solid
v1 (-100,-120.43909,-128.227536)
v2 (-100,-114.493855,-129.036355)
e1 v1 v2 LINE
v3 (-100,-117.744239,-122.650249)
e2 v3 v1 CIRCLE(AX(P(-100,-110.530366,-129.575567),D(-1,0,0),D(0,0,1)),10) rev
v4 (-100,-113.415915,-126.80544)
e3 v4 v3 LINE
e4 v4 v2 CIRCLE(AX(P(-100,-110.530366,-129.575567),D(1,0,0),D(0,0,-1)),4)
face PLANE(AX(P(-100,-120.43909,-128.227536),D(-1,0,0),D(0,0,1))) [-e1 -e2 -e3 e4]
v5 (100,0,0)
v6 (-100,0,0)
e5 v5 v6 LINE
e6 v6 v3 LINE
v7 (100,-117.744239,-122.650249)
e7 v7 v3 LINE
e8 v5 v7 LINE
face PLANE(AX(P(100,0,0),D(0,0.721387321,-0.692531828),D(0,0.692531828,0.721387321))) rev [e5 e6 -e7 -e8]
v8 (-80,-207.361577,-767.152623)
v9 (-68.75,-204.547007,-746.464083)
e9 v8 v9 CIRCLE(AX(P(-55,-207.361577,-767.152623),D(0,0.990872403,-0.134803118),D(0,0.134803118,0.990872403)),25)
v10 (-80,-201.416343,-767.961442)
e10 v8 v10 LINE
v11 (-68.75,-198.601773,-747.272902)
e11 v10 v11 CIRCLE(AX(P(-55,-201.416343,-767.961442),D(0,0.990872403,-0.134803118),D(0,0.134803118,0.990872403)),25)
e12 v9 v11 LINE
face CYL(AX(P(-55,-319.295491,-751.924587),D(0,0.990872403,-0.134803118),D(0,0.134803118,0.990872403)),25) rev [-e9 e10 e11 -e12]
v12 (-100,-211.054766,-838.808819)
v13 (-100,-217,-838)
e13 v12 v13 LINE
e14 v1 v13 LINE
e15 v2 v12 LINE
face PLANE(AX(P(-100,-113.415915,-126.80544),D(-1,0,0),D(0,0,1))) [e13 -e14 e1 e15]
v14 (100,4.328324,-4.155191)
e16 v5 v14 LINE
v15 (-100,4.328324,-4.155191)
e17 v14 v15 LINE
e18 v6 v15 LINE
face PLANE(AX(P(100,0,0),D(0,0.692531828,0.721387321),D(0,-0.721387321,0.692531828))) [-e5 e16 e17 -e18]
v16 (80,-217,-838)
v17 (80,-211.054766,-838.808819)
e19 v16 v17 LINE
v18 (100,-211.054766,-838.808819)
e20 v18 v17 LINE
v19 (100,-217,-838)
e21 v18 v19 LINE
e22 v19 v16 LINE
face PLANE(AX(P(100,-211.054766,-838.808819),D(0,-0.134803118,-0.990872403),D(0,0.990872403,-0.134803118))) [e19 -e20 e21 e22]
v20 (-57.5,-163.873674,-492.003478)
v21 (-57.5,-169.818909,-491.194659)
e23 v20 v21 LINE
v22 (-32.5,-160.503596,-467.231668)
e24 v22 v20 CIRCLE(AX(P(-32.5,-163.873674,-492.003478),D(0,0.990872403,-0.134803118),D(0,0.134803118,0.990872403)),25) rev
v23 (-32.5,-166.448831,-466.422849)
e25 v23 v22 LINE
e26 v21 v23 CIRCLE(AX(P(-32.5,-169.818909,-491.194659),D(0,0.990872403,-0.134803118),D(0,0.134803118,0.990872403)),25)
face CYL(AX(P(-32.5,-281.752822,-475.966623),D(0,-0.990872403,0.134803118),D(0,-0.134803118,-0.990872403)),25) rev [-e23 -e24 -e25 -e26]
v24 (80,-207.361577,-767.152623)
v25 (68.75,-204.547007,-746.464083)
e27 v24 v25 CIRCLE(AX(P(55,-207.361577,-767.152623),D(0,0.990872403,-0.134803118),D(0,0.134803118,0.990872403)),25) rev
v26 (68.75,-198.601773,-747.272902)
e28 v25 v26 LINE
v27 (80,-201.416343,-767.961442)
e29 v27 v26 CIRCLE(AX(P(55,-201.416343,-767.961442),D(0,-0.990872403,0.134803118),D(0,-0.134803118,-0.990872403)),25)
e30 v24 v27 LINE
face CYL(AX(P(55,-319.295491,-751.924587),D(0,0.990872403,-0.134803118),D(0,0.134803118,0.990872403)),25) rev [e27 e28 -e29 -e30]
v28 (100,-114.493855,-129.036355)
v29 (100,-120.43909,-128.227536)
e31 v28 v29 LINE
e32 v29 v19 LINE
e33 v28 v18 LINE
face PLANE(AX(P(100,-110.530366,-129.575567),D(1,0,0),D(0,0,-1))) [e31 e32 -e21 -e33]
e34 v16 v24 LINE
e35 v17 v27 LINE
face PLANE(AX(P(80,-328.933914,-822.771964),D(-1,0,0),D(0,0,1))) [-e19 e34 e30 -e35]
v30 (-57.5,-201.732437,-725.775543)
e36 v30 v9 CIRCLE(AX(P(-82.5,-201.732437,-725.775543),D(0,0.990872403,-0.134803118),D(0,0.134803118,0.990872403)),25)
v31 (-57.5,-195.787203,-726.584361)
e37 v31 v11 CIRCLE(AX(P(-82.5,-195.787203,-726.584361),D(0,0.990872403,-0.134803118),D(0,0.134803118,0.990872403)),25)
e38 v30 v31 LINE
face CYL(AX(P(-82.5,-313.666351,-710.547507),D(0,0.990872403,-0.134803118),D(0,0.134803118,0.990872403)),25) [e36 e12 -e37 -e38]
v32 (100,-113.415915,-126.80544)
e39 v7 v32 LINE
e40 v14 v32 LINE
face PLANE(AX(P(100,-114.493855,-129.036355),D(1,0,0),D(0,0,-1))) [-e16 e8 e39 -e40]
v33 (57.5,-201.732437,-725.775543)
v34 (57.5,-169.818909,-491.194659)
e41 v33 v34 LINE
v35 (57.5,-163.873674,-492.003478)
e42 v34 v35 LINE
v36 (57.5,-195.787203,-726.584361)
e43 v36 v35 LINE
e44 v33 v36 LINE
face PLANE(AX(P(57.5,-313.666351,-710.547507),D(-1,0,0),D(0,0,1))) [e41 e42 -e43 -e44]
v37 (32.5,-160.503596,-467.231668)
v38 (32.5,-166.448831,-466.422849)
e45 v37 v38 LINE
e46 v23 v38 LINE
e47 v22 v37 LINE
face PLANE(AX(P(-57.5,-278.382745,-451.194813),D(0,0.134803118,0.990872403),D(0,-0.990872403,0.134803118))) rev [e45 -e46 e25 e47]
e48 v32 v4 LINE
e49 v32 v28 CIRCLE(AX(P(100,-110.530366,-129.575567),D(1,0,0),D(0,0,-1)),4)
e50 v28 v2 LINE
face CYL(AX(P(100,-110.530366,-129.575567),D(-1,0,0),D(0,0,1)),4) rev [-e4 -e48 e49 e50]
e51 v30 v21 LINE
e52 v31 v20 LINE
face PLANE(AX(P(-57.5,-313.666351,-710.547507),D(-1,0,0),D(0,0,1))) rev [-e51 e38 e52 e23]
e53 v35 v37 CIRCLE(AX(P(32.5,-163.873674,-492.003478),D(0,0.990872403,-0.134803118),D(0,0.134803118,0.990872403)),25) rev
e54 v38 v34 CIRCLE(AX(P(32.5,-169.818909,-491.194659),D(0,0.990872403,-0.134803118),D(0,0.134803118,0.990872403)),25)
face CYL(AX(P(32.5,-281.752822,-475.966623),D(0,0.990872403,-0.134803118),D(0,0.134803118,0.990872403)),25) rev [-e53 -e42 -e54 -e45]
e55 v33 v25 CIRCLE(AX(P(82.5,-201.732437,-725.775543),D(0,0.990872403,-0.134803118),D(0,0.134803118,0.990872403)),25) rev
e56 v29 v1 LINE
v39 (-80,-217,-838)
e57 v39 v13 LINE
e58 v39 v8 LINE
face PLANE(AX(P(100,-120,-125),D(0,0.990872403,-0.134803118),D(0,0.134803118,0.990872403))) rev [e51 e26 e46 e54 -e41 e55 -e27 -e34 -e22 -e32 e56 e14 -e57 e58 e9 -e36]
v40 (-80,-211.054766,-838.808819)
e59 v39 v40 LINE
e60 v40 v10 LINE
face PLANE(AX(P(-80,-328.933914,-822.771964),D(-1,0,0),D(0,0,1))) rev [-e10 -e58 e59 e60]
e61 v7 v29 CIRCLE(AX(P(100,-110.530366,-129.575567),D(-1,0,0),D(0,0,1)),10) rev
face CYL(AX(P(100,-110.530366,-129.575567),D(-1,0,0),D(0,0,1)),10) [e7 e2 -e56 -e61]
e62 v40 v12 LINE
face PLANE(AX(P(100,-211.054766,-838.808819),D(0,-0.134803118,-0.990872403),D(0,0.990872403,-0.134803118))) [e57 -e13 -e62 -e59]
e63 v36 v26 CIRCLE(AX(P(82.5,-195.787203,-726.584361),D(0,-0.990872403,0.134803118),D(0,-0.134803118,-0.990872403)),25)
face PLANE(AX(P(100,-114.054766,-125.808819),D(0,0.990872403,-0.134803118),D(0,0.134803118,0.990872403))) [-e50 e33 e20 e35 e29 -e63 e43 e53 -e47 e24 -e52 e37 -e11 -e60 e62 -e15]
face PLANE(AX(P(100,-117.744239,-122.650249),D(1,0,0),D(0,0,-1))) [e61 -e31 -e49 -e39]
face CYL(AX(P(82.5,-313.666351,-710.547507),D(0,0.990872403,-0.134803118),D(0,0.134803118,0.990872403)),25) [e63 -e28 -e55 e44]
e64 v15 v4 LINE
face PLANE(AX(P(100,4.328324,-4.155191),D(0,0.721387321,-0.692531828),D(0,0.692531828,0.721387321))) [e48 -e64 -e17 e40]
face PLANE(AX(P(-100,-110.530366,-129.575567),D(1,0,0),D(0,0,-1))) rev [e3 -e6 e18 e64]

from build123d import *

# Parameters (mm, degrees)
SM_BASE_FLANGE_1_DEPTH = 100
CUT_EXTRUDE_1_DEPTH    = 867.216543549
FILLET_1_R             = 25


# Sheet-metal steps are written as plain solids
with BuildPart() as part:
    # Sketch 1 → 基体-法兰1 (new, symmetric)
    with BuildSketch(Plane(origin=(0, 0, 0), x_dir=(0, 0, -1), z_dir=(1, 0, 0))):
        with BuildLine():
            Line((0, 0), (122.650248882, -117.744238927))
            ThreePointArc((122.650248882, -117.744238927), (125.224977196, -119.534385204), (128.227535984, -120.439089748))
            Line((128.227535984, -120.439089748), (838, -217))
            Line((838, -217), (838.808818708, -211.054765581))
            Line((838.808818708, -211.054765581), (129.036354692, -114.493855329))
            ThreePointArc((129.036354692, -114.493855329), (127.835331177, -114.131973511), (126.805439851, -113.415915001))
            Line((126.805439851, -113.415915001), (4.155190969, 4.328323926))
            Line((4.155190969, 4.328323926), (0, 0))
        make_face()
    extrude(amount=SM_BASE_FLANGE_1_DEPTH, both=True)

    # 草图4 → 切除-拉伸1 (cut, through all)
    with BuildSketch(Plane(origin=(0, -95.177553726, 12.94841895), x_dir=(1, 0, 0), z_dir=(0, 0.9908724031816991, -0.13480311796440184))):
        with BuildLine():
            Line((-80, 859.603350465), (-80, 788.103350465))
            ThreePointArc((-80, 788.103350465), (-77.008521077, 776.244809239), (-68.75, 767.224234104))
            ThreePointArc((-68.75, 767.224234104), (-60.491478923, 758.203658969), (-57.5, 746.345117743))
            Line((-57.5, 746.345117743), (-57.5, 484.603350465))
            Line((-57.5, 484.603350465), (57.5, 484.603350465))
            Line((57.5, 484.603350465), (57.5, 746.345117743))
            ThreePointArc((57.5, 746.345117743), (60.491478923, 758.203658969), (68.75, 767.224234104))
            ThreePointArc((68.75, 767.224234104), (77.008521077, 776.244809239), (80, 788.103350465))
            Line((80, 788.103350465), (80, 859.603350465))
            Line((80, 859.603350465), (-80, 859.603350465))
        make_face()
    extrude(amount=-CUT_EXTRUDE_1_DEPTH, mode=Mode.SUBTRACT)

    # 圆角1
    fillet_1_edges = [part.edges().sort_by_distance(p)[0] for p in [
        (57.5, -163.476213554, -466.827258161),
        (-57.5, -163.476213554, -466.827258161),
    ]]
    fillet(fillet_1_edges, radius=FILLET_1_R)


solid = part.part
